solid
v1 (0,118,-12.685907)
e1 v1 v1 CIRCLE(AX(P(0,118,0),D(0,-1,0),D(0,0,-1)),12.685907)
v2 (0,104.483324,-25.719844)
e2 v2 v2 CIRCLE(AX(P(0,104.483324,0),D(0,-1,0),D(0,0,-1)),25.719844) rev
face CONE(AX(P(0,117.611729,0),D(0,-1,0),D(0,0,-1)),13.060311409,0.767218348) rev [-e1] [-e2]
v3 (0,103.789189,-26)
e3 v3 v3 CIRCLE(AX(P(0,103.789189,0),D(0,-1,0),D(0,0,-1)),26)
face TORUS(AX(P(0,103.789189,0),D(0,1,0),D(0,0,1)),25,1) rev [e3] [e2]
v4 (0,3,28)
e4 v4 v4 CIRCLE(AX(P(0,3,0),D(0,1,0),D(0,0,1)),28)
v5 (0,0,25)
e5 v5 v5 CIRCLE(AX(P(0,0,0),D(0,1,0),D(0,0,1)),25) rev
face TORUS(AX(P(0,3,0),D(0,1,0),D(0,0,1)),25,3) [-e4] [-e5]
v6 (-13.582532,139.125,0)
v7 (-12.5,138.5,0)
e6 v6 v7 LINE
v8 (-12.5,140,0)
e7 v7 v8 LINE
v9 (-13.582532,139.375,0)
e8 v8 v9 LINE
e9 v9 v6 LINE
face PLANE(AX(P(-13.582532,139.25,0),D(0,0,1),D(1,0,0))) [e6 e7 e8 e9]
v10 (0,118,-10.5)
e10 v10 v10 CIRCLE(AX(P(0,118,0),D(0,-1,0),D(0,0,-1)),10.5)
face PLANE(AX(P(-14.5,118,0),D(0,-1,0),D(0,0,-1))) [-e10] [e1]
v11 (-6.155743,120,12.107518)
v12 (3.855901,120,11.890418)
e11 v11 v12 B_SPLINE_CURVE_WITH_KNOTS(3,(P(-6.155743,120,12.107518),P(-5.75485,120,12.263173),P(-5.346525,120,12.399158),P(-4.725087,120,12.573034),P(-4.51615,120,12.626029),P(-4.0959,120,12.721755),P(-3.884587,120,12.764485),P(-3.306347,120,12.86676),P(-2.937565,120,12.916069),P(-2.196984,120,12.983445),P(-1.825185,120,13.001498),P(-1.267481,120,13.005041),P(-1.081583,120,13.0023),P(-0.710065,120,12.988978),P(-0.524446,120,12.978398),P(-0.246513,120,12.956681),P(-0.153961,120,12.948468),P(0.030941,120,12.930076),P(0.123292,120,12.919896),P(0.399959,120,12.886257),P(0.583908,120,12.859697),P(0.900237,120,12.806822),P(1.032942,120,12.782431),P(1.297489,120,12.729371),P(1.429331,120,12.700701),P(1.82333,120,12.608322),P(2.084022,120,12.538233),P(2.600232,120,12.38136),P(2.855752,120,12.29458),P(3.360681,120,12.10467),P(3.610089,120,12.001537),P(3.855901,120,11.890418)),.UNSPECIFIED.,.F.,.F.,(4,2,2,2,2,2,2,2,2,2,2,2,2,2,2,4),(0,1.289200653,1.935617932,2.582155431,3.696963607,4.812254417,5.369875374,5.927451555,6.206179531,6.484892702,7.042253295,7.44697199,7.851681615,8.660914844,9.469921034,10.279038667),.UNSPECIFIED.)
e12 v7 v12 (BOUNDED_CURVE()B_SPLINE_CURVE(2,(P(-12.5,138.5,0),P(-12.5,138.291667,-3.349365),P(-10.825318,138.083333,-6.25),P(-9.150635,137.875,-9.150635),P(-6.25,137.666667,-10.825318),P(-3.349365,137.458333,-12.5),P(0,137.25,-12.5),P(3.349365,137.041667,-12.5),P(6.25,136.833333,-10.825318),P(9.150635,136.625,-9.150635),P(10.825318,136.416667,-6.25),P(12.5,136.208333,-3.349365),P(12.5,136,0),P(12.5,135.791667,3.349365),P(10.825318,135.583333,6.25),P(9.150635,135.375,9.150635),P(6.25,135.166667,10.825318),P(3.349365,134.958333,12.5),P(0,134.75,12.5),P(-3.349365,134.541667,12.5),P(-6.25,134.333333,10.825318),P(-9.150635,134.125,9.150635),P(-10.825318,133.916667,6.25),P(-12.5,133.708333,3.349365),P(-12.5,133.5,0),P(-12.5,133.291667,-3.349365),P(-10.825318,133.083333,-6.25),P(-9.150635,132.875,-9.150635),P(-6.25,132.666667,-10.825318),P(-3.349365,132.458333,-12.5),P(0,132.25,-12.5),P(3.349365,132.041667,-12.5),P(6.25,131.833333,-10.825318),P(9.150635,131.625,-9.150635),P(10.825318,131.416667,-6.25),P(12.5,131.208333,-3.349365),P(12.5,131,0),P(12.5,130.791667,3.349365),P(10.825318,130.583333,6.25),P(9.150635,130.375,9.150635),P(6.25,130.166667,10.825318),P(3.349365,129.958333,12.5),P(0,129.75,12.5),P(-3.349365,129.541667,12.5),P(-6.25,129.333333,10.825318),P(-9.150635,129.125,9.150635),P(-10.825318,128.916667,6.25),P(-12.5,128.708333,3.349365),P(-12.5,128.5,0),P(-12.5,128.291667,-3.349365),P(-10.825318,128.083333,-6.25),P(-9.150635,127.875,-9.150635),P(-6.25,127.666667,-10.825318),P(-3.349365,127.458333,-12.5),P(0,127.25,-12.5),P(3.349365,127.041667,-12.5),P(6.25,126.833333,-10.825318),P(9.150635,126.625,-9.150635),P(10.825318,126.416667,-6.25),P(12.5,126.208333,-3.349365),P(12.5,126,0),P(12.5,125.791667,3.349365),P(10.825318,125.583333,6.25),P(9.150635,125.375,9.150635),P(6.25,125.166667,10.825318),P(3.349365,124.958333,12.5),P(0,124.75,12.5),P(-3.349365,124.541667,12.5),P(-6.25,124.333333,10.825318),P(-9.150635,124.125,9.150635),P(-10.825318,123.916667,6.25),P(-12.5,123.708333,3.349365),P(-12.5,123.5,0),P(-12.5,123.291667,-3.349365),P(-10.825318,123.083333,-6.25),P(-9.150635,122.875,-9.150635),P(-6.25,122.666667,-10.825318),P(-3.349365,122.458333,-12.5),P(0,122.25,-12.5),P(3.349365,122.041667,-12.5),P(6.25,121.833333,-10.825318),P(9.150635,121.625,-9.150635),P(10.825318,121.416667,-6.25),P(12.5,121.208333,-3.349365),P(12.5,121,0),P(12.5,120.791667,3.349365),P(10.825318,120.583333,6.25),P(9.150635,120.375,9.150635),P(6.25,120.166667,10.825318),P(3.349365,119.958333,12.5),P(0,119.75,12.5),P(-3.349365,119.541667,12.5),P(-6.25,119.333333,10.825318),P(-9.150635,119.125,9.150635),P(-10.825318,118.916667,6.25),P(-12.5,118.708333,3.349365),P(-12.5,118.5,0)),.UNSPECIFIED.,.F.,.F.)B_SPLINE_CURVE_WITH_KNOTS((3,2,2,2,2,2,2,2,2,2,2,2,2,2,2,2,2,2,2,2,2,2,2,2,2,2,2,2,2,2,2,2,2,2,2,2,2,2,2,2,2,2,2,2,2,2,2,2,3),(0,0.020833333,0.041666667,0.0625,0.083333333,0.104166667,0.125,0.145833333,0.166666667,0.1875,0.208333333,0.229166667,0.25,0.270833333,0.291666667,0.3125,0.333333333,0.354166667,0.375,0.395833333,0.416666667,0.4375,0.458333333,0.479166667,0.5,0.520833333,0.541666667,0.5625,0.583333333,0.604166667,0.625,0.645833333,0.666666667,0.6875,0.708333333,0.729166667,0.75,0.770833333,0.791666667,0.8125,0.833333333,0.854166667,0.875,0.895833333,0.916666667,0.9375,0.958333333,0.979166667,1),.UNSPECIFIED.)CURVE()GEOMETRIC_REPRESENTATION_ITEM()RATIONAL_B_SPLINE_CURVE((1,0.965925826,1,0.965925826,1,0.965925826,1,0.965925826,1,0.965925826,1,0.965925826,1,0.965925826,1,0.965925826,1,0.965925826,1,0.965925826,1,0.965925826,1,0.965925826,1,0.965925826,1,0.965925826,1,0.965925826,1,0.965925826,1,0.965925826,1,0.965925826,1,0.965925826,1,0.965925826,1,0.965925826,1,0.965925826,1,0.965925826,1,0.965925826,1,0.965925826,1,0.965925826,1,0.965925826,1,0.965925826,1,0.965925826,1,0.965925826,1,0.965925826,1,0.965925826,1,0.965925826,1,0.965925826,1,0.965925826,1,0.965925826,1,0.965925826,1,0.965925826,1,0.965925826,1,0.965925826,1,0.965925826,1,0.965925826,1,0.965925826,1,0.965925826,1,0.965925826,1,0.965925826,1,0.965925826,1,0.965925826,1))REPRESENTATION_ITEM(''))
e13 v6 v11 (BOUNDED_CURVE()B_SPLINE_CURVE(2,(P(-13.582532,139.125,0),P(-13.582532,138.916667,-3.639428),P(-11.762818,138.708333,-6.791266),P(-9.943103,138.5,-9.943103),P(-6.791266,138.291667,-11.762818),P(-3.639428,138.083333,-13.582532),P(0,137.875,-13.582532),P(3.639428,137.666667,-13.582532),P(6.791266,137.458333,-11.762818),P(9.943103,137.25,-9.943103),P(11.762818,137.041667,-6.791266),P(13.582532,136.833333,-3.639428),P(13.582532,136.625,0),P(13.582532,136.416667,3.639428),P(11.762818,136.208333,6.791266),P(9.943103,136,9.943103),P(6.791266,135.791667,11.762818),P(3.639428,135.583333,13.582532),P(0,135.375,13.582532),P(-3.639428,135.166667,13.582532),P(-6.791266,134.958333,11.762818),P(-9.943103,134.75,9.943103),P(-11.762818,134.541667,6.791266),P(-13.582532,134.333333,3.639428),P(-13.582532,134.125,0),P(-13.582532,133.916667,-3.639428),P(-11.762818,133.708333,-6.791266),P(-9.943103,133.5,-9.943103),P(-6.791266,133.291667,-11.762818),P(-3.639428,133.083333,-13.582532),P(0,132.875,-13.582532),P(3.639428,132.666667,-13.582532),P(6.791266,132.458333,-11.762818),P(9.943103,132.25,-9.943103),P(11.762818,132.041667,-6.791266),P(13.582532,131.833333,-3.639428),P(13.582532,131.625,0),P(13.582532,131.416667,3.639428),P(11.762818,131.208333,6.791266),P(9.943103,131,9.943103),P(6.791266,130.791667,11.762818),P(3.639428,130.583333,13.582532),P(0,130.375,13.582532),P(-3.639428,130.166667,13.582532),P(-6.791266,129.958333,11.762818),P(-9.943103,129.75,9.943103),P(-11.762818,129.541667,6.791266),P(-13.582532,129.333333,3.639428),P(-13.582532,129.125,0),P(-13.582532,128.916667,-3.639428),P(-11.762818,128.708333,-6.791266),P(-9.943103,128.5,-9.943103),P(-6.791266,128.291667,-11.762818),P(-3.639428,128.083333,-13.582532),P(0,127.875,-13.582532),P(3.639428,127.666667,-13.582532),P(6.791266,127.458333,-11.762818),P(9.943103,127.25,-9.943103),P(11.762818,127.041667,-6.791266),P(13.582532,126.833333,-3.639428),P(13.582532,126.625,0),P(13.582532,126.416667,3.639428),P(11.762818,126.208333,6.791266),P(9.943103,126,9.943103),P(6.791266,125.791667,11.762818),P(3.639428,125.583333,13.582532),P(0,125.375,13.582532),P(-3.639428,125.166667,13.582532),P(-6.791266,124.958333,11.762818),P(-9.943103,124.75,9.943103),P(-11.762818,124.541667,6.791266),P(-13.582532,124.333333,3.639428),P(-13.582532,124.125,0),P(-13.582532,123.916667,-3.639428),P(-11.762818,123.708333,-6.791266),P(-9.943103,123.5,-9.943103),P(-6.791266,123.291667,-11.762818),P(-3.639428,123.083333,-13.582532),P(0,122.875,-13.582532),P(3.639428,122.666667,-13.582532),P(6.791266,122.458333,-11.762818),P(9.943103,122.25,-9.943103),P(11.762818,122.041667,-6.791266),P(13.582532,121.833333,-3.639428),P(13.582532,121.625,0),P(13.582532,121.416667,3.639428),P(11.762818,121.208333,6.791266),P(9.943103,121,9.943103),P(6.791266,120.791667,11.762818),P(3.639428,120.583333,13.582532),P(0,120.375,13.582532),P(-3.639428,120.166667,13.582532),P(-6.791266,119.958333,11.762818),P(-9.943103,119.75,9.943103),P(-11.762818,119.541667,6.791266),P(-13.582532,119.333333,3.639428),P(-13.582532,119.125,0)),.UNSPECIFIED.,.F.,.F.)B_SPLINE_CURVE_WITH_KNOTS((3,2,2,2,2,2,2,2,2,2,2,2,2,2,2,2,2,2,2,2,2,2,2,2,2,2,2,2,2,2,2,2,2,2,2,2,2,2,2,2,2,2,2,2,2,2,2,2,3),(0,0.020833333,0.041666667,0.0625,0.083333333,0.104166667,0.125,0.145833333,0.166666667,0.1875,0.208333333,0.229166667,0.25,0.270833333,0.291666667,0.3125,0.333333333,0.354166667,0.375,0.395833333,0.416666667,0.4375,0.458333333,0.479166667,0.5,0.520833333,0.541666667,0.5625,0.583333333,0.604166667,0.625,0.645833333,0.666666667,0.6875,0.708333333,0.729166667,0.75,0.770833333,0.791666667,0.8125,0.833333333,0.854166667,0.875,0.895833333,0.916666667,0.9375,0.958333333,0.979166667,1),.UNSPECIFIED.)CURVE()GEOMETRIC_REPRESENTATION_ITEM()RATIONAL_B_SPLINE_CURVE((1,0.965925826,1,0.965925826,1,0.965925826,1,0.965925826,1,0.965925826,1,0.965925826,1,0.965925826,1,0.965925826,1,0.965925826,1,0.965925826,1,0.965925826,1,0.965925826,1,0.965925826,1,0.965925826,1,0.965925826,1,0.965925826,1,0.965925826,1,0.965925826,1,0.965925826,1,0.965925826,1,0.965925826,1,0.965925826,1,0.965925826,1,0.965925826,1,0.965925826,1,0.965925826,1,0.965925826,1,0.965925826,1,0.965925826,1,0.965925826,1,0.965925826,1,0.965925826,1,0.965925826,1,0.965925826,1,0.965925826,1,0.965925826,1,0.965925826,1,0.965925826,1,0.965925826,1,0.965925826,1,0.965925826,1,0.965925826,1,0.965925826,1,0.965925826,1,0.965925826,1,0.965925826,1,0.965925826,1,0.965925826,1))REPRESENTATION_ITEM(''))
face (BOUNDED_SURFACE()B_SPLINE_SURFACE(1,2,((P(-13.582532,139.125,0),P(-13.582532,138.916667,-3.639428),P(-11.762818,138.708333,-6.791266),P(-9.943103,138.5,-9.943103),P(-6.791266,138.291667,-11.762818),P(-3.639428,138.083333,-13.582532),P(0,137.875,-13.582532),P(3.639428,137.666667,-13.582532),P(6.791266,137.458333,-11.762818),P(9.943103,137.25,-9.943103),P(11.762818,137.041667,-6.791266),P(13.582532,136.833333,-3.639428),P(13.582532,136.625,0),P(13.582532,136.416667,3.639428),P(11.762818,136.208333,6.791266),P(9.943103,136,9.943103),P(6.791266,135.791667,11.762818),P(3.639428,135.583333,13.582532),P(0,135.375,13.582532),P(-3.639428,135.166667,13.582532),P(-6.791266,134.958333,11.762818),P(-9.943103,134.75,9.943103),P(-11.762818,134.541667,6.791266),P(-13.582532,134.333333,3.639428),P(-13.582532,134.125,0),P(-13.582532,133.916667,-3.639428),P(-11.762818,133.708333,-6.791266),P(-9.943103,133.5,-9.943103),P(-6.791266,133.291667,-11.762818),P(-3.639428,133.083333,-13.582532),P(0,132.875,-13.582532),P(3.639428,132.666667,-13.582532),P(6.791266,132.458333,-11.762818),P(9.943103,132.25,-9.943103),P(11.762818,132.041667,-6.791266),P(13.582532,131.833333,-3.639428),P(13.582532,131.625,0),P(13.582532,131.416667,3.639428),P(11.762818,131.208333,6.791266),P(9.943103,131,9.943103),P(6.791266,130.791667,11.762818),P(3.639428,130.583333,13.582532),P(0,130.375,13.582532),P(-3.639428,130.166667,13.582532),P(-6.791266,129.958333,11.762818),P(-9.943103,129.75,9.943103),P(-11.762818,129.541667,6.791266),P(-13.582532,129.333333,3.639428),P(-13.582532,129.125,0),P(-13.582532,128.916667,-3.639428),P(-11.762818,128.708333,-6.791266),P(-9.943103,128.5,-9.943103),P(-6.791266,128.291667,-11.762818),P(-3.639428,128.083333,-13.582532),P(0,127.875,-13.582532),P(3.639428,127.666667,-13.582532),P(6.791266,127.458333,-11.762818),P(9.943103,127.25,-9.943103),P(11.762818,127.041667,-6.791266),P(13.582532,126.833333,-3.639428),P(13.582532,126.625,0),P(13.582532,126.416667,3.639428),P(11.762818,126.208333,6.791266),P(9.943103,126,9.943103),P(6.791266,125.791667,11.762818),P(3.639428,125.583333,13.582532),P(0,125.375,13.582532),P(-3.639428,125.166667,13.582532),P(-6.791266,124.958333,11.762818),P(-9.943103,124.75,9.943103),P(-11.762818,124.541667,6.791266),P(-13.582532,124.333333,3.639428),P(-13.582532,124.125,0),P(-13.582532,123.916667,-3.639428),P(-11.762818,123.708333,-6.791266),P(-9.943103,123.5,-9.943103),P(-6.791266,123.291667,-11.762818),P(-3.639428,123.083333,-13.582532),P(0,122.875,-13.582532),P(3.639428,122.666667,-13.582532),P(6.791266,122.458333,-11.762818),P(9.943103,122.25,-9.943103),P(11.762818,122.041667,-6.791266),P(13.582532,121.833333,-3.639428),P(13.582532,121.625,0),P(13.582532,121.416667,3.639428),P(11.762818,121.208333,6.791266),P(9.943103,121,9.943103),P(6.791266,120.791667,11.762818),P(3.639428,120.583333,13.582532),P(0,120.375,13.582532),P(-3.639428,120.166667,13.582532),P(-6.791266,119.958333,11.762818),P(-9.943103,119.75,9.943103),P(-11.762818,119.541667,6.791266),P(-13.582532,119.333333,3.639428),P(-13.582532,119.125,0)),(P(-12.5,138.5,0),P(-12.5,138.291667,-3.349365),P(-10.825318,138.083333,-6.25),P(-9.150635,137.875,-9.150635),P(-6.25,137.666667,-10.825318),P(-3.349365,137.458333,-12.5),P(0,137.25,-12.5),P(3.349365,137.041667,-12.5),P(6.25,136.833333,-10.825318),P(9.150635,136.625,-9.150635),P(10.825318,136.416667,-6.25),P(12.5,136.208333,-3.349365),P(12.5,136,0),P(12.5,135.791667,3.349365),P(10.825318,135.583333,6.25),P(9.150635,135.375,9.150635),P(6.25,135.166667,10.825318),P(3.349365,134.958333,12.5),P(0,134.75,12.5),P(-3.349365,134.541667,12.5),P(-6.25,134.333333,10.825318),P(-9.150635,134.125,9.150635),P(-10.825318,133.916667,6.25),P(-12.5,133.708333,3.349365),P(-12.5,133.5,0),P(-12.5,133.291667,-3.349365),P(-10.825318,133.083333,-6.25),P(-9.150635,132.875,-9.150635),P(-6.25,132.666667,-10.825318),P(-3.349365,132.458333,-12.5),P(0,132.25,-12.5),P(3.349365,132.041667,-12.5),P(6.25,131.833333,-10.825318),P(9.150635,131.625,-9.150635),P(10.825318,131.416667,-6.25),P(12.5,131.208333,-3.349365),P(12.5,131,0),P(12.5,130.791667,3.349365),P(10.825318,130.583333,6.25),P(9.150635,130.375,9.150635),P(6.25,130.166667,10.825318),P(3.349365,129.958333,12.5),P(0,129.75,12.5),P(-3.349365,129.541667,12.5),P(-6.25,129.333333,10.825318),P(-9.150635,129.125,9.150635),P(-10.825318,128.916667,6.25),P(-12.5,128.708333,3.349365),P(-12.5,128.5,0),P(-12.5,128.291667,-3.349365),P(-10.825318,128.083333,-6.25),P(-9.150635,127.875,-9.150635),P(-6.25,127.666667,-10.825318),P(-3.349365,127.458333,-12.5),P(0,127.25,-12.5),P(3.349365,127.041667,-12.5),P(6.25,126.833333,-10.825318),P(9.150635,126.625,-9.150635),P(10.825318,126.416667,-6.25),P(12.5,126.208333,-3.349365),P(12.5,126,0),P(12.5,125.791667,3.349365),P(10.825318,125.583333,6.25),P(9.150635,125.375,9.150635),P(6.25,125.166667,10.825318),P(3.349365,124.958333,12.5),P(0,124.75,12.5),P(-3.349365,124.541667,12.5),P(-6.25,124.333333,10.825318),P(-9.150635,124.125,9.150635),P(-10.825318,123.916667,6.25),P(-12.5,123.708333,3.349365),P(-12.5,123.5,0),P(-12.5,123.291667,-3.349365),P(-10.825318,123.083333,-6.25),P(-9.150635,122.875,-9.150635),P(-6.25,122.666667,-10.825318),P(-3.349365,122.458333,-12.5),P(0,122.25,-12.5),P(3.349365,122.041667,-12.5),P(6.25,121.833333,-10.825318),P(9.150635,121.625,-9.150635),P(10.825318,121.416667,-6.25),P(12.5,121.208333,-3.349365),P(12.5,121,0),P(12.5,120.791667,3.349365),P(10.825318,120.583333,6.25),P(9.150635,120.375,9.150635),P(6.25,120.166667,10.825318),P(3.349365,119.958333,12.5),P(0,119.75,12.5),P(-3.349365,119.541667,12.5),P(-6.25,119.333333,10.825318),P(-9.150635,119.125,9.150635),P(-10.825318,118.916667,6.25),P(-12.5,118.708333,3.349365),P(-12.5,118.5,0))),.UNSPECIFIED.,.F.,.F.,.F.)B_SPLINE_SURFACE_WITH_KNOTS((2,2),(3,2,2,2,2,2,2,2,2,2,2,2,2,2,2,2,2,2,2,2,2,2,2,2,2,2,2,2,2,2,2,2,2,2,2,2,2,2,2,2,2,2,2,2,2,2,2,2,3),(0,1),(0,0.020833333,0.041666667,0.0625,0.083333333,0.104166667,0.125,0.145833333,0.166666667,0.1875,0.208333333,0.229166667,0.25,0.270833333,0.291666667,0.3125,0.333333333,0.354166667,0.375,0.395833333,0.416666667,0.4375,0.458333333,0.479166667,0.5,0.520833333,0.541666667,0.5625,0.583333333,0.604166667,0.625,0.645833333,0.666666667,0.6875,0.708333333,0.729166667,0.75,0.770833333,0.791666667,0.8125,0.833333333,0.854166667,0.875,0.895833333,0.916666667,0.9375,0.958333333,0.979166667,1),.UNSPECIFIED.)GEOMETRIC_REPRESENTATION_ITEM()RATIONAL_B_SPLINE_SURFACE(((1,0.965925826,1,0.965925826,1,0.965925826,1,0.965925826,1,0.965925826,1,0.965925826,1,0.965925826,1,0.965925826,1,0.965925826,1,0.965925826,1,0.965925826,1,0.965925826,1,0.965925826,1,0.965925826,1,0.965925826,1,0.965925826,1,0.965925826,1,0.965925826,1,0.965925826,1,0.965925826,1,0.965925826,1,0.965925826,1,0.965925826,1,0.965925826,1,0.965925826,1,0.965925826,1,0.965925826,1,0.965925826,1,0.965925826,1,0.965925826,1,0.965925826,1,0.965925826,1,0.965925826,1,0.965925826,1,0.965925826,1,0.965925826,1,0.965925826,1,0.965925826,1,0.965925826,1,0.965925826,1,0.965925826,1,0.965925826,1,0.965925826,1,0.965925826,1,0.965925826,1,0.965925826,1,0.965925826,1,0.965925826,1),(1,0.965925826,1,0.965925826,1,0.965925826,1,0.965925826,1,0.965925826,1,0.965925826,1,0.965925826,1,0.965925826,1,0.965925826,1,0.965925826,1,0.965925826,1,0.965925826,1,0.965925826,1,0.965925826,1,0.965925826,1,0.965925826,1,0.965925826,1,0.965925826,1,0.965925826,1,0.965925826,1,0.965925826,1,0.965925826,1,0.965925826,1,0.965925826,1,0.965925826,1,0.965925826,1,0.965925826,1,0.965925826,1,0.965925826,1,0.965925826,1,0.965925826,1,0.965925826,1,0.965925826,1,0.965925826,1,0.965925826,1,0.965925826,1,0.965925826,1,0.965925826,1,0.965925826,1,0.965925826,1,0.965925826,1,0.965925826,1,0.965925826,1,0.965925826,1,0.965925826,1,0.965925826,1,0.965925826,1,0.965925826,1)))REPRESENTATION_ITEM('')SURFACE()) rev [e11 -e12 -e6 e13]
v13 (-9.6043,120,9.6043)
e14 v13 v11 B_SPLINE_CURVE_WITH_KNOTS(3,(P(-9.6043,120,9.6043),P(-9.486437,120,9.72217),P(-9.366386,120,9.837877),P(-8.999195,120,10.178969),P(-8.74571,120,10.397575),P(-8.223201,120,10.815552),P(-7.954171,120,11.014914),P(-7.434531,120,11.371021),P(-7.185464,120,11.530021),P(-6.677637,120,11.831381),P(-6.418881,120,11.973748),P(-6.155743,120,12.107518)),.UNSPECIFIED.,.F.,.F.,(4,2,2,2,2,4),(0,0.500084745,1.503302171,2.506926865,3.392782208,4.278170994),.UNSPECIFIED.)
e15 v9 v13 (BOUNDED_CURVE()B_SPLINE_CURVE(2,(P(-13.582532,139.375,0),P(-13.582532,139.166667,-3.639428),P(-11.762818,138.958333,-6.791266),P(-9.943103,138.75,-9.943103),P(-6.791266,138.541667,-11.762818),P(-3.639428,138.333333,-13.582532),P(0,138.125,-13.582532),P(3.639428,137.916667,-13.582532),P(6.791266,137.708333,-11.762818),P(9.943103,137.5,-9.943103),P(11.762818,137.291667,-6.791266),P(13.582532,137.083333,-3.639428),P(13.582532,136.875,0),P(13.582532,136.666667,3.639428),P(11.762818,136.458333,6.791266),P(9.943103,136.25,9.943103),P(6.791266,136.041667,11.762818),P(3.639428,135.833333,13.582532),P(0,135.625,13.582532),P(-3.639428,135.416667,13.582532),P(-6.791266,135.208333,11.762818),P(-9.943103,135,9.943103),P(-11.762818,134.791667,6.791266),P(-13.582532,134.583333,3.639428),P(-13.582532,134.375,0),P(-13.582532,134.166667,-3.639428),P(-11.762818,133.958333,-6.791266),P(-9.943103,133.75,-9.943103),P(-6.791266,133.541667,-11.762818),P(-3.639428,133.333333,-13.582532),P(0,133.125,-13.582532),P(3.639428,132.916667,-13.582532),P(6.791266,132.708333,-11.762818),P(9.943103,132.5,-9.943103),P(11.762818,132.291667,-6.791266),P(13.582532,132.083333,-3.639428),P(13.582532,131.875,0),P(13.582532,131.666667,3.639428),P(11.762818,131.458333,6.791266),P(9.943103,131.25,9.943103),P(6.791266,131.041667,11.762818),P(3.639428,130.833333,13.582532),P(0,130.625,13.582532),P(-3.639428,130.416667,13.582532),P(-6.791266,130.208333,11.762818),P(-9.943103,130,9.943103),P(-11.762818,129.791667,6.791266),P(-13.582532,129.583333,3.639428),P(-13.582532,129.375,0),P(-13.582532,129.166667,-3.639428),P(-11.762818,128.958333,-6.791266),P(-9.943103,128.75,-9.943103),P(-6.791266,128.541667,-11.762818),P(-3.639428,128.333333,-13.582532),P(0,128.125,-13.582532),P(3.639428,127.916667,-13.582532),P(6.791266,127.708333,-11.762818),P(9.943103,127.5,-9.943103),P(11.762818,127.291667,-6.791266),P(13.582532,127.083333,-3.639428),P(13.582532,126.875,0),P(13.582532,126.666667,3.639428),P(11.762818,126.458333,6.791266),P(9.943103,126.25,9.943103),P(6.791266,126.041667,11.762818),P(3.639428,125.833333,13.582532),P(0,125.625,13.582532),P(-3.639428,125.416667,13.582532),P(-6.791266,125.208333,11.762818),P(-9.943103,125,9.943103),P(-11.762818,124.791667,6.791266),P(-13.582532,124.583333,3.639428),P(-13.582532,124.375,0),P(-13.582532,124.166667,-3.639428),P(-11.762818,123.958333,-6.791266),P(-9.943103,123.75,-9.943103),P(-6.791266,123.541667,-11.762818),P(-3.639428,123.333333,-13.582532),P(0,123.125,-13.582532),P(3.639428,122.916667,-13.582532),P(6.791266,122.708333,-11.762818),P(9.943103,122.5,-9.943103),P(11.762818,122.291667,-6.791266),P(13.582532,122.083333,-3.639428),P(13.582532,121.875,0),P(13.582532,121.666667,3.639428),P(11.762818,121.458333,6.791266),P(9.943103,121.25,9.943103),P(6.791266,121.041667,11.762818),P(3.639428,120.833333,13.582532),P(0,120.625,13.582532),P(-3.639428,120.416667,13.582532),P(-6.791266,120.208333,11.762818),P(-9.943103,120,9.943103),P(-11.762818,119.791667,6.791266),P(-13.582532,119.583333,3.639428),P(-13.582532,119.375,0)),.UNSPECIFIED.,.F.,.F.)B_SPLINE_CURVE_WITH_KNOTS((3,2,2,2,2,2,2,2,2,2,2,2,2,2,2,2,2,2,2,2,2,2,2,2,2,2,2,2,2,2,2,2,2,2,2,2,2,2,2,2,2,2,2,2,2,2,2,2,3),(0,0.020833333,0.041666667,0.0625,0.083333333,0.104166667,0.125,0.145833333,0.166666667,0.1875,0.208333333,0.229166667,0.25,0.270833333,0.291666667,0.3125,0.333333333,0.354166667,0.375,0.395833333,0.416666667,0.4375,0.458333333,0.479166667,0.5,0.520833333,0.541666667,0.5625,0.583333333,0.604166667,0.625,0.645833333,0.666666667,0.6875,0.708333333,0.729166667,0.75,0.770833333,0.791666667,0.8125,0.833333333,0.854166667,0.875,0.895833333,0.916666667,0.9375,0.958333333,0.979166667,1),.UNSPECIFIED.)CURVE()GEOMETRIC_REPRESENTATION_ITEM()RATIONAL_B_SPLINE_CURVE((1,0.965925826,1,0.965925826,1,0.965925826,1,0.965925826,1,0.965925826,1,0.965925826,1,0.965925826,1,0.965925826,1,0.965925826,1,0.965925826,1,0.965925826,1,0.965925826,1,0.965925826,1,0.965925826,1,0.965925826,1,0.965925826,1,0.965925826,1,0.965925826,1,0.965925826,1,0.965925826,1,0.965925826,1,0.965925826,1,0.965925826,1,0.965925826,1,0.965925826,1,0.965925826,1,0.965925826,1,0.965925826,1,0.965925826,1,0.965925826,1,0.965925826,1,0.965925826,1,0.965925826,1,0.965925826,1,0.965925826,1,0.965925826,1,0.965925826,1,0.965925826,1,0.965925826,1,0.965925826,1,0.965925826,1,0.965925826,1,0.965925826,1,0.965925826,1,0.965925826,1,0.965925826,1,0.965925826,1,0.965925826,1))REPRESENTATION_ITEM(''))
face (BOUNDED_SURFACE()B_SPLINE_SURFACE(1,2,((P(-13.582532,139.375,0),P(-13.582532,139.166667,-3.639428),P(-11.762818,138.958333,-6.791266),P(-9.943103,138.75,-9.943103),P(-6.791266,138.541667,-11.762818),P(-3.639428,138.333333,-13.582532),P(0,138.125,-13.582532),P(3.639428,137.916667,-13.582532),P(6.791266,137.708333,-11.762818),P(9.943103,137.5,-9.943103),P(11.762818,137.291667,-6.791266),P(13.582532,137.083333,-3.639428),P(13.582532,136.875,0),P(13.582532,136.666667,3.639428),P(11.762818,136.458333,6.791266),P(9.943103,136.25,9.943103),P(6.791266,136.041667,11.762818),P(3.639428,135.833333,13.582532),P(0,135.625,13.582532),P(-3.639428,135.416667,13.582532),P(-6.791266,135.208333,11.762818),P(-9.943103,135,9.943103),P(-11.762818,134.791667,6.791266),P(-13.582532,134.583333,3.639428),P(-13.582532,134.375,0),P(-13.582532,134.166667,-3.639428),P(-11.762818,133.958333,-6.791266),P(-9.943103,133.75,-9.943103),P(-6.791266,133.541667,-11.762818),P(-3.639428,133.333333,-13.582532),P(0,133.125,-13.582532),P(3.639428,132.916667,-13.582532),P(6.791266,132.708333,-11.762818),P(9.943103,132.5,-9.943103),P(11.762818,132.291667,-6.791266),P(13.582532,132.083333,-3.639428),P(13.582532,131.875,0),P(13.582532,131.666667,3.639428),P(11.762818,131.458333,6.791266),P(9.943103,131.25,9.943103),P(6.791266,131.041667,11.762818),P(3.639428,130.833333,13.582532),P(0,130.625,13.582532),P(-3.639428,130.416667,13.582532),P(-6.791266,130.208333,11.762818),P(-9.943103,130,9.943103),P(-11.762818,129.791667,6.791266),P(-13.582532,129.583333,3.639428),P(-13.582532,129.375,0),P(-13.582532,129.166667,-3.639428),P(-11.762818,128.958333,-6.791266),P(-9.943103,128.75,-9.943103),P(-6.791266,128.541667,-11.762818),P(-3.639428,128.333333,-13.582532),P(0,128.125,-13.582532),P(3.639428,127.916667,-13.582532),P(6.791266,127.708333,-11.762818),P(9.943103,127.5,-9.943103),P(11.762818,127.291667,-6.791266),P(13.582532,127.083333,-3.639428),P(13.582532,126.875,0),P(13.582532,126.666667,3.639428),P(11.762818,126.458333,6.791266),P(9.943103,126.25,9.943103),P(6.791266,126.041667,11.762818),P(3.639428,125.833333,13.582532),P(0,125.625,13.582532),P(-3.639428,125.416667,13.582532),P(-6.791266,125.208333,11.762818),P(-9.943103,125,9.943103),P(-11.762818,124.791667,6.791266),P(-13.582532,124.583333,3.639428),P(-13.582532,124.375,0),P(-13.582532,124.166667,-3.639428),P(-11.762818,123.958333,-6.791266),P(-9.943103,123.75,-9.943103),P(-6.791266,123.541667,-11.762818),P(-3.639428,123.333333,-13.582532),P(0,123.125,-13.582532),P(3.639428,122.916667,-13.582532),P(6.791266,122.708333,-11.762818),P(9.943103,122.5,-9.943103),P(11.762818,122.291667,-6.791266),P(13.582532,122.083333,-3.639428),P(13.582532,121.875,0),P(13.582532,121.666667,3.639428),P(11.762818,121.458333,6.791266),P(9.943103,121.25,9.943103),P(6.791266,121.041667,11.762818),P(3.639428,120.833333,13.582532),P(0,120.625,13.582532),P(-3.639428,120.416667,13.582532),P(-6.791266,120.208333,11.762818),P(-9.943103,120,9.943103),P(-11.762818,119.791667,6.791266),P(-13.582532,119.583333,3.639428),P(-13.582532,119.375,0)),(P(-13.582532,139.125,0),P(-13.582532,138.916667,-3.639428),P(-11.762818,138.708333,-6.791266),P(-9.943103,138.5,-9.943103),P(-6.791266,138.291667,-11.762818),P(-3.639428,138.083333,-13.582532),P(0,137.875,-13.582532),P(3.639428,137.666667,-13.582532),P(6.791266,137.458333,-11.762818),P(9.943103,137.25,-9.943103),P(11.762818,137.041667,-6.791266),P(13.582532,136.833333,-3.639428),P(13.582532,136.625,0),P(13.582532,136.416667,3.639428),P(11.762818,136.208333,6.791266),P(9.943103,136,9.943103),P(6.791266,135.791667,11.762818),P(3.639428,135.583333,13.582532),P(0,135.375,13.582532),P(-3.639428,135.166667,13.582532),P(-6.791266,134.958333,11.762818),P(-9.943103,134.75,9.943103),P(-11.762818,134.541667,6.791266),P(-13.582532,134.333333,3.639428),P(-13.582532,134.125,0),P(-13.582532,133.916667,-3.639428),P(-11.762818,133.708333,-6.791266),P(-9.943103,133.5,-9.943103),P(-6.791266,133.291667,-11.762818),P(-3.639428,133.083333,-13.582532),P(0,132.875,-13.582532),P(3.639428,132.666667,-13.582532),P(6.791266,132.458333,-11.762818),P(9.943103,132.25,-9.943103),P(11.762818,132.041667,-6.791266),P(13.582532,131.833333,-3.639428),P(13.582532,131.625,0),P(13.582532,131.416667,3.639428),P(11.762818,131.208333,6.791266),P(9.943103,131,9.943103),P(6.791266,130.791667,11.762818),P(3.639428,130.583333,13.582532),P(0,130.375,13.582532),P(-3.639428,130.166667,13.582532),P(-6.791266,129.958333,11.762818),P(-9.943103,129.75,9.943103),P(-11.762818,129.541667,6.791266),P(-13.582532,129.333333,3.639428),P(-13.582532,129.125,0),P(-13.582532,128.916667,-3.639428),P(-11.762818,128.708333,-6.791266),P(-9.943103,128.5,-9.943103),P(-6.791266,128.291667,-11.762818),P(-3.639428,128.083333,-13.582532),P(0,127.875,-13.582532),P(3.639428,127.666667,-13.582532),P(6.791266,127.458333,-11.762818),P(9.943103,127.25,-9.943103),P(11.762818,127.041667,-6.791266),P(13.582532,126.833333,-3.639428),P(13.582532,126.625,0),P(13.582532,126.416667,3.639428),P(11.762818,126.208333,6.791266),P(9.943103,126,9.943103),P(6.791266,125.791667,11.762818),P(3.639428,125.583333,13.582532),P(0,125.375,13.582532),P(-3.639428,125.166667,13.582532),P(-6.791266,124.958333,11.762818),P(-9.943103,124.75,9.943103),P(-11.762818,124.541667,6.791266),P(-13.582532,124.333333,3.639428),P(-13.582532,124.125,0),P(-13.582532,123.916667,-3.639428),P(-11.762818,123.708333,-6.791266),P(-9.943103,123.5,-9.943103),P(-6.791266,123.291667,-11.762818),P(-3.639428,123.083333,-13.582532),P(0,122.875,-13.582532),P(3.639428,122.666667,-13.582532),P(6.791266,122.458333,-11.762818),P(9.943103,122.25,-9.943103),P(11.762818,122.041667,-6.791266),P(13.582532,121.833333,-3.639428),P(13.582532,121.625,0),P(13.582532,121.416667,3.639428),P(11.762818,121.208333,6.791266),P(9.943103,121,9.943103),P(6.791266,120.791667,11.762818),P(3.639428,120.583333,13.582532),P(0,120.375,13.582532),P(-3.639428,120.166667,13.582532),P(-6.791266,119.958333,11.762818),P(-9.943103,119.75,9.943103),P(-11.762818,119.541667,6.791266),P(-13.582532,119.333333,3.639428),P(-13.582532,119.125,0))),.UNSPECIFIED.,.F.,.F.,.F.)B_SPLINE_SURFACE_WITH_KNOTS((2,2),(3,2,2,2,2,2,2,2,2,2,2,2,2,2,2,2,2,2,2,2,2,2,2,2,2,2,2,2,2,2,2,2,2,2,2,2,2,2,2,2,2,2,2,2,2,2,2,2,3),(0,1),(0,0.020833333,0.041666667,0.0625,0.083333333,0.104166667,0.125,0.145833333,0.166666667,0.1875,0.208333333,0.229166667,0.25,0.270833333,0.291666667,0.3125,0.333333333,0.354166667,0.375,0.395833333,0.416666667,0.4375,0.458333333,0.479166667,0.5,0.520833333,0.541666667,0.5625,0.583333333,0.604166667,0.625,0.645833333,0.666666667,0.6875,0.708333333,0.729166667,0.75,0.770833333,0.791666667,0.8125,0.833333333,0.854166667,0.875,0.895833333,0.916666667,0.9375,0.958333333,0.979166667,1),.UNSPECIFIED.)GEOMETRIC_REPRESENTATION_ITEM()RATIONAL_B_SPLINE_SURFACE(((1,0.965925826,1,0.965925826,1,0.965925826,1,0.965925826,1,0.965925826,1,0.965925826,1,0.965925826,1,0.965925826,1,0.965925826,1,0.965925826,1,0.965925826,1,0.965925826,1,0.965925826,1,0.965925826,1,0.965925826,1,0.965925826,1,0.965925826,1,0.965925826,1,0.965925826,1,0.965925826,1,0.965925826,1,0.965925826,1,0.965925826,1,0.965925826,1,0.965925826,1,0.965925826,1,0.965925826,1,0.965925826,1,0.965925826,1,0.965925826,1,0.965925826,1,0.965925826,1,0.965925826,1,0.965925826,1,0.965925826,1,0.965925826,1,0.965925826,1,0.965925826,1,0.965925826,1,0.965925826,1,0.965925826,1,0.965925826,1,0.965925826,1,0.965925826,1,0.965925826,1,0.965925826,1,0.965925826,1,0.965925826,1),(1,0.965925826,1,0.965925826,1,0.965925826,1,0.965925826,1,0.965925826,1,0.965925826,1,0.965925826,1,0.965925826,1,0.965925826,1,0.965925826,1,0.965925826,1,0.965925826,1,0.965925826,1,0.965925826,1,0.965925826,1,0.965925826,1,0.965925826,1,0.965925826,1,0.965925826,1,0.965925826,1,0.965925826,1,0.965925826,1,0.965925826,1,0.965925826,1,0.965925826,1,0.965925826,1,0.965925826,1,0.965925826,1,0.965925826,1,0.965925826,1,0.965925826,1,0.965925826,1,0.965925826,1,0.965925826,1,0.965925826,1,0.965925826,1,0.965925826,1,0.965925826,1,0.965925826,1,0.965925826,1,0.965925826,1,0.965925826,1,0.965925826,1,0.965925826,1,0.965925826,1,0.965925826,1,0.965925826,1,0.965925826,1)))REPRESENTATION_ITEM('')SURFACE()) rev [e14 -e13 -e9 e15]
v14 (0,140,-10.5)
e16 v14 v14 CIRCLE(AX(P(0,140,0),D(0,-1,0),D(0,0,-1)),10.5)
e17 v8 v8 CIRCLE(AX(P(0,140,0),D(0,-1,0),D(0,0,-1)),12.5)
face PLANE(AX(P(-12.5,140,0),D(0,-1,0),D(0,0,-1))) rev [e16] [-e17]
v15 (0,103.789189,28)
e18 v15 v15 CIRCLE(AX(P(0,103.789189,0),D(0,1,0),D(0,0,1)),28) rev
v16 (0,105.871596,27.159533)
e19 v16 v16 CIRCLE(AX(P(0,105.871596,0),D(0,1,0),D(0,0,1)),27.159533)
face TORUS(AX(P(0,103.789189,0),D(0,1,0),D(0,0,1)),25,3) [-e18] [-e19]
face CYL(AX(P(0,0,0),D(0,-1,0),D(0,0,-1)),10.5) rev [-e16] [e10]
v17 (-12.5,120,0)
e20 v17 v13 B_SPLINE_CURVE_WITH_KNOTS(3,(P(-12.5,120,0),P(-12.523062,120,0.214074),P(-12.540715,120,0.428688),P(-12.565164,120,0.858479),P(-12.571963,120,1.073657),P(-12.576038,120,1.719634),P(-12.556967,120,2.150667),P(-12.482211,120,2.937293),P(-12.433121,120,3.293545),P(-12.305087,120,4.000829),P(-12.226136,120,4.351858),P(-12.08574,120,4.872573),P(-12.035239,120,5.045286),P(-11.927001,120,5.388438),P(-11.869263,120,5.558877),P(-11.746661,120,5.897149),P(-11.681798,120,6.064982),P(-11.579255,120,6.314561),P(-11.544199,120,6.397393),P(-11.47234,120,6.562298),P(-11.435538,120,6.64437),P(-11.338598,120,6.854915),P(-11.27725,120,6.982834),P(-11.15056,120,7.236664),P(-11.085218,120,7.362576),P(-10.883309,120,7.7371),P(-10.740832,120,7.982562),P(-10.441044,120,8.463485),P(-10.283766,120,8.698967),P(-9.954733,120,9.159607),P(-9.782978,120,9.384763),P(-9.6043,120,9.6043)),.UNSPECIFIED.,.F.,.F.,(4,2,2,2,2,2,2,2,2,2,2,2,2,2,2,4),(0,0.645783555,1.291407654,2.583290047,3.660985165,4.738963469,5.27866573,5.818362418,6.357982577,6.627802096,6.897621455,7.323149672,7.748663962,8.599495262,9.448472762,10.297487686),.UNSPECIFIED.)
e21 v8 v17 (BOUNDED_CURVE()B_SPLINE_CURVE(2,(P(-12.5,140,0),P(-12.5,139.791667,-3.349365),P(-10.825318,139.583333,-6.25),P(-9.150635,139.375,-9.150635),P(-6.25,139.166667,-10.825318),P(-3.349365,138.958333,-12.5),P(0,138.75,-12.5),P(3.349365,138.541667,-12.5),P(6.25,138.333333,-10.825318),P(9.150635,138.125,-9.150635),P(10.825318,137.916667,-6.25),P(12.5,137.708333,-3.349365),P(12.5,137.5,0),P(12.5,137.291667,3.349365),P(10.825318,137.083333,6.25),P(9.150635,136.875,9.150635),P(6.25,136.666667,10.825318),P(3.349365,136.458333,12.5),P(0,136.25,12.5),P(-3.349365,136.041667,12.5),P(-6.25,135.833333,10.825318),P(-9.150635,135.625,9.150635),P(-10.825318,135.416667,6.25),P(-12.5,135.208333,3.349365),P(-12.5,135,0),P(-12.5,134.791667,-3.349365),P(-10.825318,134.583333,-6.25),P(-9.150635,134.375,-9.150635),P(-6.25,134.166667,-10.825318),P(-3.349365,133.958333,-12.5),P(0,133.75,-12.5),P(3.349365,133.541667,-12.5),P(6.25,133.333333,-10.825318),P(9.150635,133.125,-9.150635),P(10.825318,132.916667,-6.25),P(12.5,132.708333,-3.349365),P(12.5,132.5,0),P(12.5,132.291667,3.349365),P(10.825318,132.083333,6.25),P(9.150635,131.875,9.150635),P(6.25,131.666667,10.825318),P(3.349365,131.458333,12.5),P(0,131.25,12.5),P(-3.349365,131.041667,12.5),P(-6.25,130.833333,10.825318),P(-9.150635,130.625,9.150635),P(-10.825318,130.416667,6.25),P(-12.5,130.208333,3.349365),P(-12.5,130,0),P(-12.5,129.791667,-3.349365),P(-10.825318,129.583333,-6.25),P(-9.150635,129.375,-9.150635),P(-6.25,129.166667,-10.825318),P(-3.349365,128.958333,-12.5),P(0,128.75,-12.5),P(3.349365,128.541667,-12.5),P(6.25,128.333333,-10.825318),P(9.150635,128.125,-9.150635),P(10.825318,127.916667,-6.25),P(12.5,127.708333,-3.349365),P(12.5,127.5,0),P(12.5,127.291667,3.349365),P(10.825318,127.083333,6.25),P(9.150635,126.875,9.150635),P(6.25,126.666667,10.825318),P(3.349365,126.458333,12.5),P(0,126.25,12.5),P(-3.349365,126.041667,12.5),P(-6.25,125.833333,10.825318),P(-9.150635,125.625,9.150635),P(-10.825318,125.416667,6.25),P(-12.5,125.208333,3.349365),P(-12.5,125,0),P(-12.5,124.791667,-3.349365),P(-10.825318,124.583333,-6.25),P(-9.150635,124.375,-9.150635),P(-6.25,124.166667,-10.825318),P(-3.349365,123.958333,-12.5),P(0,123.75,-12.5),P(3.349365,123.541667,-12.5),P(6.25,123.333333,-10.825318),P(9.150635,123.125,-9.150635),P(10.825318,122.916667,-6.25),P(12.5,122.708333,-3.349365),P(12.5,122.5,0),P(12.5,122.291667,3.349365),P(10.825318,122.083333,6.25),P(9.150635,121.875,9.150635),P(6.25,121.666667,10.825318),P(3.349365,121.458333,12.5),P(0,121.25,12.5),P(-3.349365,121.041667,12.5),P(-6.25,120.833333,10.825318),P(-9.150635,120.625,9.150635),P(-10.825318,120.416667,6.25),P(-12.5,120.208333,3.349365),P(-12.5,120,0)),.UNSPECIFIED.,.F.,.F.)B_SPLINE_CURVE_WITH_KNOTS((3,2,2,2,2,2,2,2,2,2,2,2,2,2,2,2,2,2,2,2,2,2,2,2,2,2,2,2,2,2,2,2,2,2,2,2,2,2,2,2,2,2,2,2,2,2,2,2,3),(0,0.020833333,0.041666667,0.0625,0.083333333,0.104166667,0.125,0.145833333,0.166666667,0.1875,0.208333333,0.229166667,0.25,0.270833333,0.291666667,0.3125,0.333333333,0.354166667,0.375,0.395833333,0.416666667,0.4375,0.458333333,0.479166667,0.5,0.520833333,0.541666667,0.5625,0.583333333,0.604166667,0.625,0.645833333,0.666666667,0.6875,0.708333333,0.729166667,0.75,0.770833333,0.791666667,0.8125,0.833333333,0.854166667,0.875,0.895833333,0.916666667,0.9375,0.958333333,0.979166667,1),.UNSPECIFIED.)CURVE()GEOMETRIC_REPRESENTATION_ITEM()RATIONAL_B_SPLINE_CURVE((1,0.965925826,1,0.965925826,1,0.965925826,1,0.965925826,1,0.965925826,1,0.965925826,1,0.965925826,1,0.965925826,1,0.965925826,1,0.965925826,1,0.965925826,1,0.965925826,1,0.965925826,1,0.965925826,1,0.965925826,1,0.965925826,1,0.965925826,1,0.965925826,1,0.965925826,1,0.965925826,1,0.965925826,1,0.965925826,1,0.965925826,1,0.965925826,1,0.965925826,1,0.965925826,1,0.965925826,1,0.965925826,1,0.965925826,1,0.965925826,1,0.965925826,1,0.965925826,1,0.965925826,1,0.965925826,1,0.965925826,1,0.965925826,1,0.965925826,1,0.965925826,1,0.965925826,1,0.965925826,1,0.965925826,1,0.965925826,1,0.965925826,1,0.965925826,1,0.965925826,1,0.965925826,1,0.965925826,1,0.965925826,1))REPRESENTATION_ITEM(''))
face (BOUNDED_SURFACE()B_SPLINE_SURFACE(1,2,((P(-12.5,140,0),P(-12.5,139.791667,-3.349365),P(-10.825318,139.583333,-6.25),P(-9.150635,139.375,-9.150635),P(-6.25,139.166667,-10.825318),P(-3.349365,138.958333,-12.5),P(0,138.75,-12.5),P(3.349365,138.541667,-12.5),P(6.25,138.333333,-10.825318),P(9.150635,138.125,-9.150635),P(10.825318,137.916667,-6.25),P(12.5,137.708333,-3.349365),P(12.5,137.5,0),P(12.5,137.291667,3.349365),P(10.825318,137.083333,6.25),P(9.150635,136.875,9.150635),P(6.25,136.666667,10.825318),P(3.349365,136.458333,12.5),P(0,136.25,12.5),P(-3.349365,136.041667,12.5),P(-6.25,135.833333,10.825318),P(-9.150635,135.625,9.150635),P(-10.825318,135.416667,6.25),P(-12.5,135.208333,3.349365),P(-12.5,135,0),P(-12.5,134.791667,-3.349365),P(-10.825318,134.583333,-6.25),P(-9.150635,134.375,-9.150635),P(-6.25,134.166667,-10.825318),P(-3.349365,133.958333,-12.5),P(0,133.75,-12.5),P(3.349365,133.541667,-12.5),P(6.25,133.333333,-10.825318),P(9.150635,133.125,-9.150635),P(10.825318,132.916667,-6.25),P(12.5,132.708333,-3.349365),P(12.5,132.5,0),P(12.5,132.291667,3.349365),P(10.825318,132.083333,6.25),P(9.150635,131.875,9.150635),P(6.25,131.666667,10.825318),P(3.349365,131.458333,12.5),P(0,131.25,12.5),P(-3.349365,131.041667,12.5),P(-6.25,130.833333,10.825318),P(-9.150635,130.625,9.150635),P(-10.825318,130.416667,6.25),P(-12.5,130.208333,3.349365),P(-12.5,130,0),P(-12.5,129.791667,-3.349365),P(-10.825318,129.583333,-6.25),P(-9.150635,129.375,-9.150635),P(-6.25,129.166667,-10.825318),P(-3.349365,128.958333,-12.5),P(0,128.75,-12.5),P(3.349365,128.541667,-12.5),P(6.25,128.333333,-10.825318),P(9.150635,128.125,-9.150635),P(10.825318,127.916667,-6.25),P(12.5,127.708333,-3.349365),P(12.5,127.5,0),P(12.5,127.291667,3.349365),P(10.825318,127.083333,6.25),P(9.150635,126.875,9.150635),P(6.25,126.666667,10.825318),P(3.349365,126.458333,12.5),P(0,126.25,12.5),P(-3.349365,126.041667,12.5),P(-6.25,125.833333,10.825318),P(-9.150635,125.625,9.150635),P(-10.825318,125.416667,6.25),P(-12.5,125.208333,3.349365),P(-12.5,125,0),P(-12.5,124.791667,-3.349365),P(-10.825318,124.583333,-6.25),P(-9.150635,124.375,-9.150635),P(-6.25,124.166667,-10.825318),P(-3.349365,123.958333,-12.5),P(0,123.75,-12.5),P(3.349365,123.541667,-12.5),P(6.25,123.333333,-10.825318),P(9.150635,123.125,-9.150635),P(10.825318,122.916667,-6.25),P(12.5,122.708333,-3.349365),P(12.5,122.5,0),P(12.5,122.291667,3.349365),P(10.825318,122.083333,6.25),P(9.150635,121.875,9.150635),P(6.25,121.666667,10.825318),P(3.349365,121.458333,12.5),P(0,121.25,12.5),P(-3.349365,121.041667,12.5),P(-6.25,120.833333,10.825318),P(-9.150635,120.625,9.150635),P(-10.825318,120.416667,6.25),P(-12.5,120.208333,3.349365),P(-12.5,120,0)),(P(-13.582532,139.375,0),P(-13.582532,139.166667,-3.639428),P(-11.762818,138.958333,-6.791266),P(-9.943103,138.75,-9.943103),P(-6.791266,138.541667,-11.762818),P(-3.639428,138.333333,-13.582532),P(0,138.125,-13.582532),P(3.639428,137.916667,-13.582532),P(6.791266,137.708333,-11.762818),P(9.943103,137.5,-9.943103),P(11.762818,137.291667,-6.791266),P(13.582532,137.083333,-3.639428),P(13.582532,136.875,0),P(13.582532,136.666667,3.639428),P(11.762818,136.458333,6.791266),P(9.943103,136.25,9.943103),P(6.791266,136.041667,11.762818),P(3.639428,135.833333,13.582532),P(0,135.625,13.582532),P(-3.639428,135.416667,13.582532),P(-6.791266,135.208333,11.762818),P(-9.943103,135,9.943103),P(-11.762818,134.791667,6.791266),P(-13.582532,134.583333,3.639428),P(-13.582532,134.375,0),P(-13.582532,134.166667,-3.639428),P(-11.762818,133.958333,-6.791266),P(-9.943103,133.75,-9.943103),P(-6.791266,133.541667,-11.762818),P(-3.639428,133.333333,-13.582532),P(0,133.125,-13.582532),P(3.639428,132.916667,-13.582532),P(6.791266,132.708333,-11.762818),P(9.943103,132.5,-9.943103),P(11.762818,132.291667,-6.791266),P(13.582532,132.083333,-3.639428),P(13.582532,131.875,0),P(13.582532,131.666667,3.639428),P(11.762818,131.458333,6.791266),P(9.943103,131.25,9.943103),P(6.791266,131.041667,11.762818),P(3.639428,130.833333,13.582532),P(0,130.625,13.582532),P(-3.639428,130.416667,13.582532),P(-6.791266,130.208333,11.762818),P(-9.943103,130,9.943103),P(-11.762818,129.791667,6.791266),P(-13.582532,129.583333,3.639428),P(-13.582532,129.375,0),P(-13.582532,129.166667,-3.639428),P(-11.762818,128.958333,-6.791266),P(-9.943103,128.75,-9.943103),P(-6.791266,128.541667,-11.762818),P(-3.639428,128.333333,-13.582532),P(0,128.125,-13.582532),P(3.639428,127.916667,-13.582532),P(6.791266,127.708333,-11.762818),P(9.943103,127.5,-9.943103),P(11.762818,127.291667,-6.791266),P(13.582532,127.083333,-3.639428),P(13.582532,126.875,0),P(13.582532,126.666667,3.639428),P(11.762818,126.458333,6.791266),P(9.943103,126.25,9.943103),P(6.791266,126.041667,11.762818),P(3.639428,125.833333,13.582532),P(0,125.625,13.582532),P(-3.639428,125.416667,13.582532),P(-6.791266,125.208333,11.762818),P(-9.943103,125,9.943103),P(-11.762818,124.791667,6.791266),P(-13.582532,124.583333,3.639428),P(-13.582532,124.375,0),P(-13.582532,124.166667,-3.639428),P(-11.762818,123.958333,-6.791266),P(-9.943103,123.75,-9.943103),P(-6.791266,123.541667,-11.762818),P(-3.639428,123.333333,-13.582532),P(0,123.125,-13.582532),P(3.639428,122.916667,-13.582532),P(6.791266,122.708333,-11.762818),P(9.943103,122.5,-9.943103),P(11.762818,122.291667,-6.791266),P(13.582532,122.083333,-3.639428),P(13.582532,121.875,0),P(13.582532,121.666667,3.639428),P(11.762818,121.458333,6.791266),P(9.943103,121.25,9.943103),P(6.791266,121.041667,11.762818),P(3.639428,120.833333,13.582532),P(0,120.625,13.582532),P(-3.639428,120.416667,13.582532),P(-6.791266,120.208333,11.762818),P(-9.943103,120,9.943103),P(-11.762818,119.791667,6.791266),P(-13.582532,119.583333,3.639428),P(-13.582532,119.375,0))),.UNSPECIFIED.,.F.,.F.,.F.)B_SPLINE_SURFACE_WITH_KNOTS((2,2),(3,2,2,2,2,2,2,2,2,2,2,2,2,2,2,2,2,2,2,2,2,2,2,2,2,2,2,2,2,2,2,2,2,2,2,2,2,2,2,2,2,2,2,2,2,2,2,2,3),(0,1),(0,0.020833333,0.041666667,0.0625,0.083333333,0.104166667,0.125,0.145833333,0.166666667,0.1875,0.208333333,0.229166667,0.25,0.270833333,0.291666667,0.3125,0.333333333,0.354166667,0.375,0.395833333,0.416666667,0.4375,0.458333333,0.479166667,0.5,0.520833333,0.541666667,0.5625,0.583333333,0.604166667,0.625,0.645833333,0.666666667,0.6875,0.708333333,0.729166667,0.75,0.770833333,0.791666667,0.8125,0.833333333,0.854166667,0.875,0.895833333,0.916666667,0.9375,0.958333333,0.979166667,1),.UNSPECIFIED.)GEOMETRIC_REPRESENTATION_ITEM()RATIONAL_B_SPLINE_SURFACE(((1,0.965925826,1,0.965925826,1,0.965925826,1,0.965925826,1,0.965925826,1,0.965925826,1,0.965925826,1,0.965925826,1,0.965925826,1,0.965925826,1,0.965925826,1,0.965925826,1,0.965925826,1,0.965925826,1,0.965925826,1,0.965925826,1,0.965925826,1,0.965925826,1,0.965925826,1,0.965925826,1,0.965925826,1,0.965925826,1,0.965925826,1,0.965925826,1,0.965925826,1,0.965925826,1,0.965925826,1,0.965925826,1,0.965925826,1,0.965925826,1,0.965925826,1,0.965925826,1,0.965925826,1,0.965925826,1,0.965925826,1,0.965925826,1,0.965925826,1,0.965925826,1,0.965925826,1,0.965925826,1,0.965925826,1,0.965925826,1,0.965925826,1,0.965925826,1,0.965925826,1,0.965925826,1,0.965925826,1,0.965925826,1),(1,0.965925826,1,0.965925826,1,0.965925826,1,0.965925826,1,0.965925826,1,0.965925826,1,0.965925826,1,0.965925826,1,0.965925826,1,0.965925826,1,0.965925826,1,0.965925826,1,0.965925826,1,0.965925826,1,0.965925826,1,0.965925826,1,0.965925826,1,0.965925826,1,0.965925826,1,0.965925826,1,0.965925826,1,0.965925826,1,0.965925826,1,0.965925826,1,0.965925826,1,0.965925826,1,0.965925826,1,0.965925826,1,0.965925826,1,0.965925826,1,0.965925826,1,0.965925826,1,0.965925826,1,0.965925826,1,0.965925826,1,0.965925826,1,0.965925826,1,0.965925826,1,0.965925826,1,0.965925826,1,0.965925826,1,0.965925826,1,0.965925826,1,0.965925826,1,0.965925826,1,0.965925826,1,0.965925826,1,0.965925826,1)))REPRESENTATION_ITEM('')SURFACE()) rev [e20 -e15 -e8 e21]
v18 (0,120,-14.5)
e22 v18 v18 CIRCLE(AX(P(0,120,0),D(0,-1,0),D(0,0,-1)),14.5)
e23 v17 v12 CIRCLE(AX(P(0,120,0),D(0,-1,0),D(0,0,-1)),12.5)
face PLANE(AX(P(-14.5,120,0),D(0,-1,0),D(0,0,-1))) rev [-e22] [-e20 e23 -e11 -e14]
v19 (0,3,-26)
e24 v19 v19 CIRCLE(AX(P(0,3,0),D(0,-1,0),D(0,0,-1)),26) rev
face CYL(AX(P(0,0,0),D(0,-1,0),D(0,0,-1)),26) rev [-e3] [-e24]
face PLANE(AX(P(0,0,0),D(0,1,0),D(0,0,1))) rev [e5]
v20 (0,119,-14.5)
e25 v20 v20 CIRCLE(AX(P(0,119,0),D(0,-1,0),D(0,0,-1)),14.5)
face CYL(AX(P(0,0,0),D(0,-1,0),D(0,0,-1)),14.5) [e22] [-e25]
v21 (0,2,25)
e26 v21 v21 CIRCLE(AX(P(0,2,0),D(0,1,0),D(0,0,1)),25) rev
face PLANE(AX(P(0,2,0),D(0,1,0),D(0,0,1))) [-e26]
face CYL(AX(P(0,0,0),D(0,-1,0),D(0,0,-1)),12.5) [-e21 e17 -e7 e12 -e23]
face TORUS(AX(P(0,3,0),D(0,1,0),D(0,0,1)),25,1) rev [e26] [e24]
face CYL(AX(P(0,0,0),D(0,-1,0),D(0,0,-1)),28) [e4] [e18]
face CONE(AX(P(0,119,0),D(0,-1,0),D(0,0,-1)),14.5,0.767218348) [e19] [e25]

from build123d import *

# Parameters (mm, degrees)
RADYUS1_R  = 3
DI_1_PITCH = 5


# Read off the part's stored shape, not the designer's step: İç Boşaltma1
with BuildPart() as part:
    # Çizim1 → Döndür1 (revolve)
    with BuildSketch(Plane.XY, mode=Mode.PRIVATE) as d_nd_r1_sk:
        Polygon((0, 0), (-28, 0), (-28, 105), (-14.5, 119), (-14.5, 120), (-12.5, 120), (-12.5, 140), (0, 140), align=None)
    revolve(d_nd_r1_sk.sketch.rotate(Axis((0, 0, 0), (0, 1, 0)), 270), axis=Axis((0, 0, 0), (0, 1, 0)))

    # Radyus1
    radyus1_edges = [part.edges().sort_by_distance(p)[0] for p in [
        (0, 105, 28),
        (0, 0, 28),
    ]]
    fillet(radyus1_edges, radius=RADYUS1_R)

    # İç Boşaltma1 outline → İç Boşaltma1 (revolve, cut)
    with BuildSketch(Plane.XY):
        with BuildLine():
            Line((0, 140), (0, 2))
            Line((0, 2), (25, 2))
            ThreePointArc((25, 2), (25.707106781, 2.292893219), (26, 3))
            Line((26, 3), (26, 103.789188814))
            ThreePointArc((26, 103.789188814), (25.927319873, 104.163458572), (25.719844295, 104.483324384))
            Line((25.719844295, 104.483324384), (12.685907094, 118))
            Line((12.685907094, 118), (10.5, 118))
            Line((10.5, 118), (10.5, 140))
            Line((10.5, 140), (0, 140))
        make_face()
    revolve(axis=Axis((0, 0, 0), (0, 1, 0)), mode=Mode.SUBTRACT)

    # Diş1: the profile of Diş Profili1 profile screwed along a right-hand helix of 4 turns, 12 arcs to a turn; built about Z, then put on its axis
    di_1_z = Axis((0, 0, 0), (0, 0, 1))
    di_1_corners = [(12.4997, 0, -0.000173205), (13.58253175, 0, 0.624999997), (13.58253175, 0, 0.874999997), (12.4997, 0, 1.5001732)]
    with BuildLine(mode=Mode.PRIVATE) as di_1_profile:
        Line(di_1_corners[0], di_1_corners[1])
        Line(di_1_corners[1], di_1_corners[2])
        Line(di_1_corners[2], di_1_corners[3])
        Line(di_1_corners[3], di_1_corners[0])
    di_1_cap = Face(di_1_profile.wire())
    di_1_turn_angles = [0, 15, 30, 45, 60, 75, 90, 105, 120, 135, 150, 165, 180, 195, 210, 225, 240, 255, 270, 285, 300, 315, 330, 345, 360]
    di_1_turn_weights = [1, 0.9659258262890683, 1, 0.9659258262890683, 1, 0.9659258262890683, 1, 0.9659258262890683, 1, 0.9659258262890683, 1, 0.9659258262890683, 1, 0.9659258262890683, 1, 0.9659258262890683, 1, 0.9659258262890683, 1, 0.9659258262890683, 1, 0.9659258262890683, 1, 0.9659258262890683, 1]
    di_1_turn_rails = [Edge.make_bspline([Vector(p[0], p[1], 0).rotate(di_1_z, di_1_turn_angles[k]) / di_1_turn_weights[k] + Vector(0, 0, p[2] + DI_1_PITCH * di_1_turn_angles[k] / 360) for k in range(25)], [0, 0, 0, 1, 1, 2, 2, 3, 3, 4, 4, 5, 5, 6, 6, 7, 7, 8, 8, 9, 9, 10, 10, 11, 11, 12, 12, 12], 2, di_1_turn_weights) for p in di_1_corners]
    di_1_turn_sides = [Face.make_surface_from_curves(di_1_turn_rails[p[0]], di_1_turn_rails[p[1]]) for p in [(0, 1), (1, 2), (2, 3), (3, 0)]]
    di_1 = Plane(origin=(0, 140, 0), x_dir=(-1, 0, 0), z_dir=(0, -1, 0)) * Solid(Shell([*[p.moved(Location((0, 0, DI_1_PITCH * i))) for i in range(4) for p in di_1_turn_sides], di_1_cap, di_1_cap.rotate(di_1_z, 1440).moved(Location((0, 0, DI_1_PITCH * 1440 / 360)))]))
    add(di_1)


solid = part.part
